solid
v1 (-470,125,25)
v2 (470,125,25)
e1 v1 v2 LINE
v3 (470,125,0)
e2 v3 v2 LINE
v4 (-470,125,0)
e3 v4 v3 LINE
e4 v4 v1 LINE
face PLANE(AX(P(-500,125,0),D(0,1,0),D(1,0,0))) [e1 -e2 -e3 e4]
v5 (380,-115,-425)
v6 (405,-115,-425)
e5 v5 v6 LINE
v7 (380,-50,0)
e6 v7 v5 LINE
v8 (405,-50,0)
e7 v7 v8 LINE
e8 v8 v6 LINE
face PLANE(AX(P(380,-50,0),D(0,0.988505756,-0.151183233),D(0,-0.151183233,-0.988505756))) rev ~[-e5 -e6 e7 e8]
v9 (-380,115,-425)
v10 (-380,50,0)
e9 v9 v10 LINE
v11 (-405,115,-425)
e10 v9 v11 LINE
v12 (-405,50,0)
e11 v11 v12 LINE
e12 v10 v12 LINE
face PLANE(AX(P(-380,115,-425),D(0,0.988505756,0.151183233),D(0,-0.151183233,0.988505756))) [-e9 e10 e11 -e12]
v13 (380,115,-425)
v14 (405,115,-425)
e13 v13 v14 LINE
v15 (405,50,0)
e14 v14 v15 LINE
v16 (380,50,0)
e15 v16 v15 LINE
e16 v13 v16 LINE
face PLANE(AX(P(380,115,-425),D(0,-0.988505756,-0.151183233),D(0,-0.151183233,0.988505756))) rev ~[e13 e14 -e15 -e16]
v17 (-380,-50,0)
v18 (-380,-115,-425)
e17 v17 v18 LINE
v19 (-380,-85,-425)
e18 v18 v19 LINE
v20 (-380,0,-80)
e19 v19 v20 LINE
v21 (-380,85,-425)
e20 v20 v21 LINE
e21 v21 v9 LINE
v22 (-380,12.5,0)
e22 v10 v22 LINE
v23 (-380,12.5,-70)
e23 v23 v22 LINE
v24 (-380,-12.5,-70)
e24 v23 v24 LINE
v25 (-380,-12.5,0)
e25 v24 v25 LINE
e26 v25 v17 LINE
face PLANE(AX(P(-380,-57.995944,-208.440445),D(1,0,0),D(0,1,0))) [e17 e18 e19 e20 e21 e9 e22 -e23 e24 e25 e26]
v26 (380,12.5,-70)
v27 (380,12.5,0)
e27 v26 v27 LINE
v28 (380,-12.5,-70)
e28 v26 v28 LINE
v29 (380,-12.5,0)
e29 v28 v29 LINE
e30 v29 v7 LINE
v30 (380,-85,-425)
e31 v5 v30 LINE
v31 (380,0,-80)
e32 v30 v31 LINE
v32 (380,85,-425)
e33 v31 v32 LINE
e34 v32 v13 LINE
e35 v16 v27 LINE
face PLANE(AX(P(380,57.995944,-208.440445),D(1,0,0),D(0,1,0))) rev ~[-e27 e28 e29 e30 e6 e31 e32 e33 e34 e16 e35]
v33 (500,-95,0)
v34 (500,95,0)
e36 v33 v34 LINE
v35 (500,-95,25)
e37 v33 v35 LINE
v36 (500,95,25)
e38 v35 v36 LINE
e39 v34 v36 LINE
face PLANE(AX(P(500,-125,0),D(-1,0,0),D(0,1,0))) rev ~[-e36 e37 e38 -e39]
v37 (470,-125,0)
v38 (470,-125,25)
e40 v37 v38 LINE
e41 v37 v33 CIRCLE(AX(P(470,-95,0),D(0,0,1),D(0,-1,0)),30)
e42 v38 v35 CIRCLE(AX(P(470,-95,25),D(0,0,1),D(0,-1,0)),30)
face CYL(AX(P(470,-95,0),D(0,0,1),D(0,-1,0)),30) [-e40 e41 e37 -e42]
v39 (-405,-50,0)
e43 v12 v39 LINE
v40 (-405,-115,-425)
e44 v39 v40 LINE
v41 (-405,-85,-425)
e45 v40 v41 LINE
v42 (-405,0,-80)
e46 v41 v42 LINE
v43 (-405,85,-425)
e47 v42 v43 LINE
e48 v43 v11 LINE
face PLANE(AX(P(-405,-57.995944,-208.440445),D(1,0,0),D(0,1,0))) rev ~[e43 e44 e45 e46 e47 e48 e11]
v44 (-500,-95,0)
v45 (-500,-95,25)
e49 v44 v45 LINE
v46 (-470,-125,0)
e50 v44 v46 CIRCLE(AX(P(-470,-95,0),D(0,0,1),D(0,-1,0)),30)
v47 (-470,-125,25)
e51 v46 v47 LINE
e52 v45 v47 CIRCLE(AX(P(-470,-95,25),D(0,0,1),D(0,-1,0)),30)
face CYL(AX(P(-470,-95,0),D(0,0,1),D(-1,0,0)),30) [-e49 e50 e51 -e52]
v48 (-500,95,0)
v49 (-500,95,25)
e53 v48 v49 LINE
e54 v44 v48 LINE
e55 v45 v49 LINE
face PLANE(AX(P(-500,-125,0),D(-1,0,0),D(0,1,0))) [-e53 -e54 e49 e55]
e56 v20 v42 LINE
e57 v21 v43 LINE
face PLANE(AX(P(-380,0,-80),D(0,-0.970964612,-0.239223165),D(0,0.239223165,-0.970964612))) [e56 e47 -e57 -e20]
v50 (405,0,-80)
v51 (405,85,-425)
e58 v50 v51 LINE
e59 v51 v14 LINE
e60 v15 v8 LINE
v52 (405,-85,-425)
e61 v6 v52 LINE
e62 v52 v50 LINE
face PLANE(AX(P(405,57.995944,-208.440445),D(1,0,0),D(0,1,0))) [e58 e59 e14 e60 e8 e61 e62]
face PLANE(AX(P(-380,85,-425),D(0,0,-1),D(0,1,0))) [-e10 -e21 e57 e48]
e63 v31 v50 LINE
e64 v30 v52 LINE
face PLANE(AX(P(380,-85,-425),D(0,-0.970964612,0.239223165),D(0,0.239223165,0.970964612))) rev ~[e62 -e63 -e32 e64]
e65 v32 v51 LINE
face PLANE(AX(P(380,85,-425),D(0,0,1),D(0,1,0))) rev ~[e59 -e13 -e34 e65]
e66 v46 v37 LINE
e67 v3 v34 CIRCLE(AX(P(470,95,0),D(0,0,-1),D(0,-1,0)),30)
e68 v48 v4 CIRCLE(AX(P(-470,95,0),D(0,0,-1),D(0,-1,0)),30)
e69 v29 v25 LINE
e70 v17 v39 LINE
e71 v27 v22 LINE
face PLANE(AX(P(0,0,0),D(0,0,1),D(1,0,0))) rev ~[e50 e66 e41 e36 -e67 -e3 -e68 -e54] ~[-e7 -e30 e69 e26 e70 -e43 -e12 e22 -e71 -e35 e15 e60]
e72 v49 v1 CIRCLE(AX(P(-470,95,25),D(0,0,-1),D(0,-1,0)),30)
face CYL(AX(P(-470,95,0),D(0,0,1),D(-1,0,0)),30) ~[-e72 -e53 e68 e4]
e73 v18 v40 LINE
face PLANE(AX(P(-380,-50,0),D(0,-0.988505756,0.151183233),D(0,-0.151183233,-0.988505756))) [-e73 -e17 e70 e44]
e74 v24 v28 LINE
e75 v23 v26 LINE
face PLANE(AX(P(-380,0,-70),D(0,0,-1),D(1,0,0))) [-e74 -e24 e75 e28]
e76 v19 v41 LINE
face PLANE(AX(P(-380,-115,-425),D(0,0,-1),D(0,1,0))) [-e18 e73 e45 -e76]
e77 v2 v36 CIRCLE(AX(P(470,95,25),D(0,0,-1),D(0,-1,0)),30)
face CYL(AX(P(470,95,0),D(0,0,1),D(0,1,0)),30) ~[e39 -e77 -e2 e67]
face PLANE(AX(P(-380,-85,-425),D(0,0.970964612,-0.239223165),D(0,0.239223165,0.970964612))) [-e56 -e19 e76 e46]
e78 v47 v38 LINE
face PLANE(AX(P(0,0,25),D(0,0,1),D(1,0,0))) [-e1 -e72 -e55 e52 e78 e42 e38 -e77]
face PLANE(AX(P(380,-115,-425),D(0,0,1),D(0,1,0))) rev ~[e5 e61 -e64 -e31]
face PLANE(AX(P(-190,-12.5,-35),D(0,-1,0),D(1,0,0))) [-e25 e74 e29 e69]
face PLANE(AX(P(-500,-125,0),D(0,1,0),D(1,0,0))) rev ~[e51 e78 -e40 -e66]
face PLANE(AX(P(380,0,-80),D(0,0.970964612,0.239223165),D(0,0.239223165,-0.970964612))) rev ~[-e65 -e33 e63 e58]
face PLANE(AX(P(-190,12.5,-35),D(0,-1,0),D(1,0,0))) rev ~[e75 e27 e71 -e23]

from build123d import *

# Parameters (mm, degrees)
F0_W     = 1000
F0_H     = 250
F1_DEPTH = 25
F2_W     = 380
F2_H     = 70
F3_DEPTH = 12.5
F5_START = 380
F5_DEPTH = 25
F6_START = -380
F6_DEPTH = 25
F7_R     = 30


with BuildPart() as f1:
    # F0 (on Top) → F1 (new body)
    with BuildSketch(Plane.XY):
        Rectangle(F0_W, F0_H)
    extrude(amount=F1_DEPTH)

    # F2 (on Front) → F3 (join, symmetric)
    with BuildSketch(Plane.XZ):
        with Locations((-190, -35)):
            Rectangle(F2_W, F2_H)
        with Locations((190, -35)):
            Rectangle(F2_W, F2_H)
    extrude(amount=F3_DEPTH, both=True)

    # F4 (on Right) → F5 (join)
    with BuildSketch(Plane.YZ.offset(F5_START)):
        Polygon((50, 0), (0, 0), (0, -80), (85, -425), (115, -425), align=None)
        Polygon((0, -80), (0, 0), (-50, 0), (-115, -425), (-85, -425), align=None)
    extrude(amount=F5_DEPTH)

    # F4 (on Right) → F6 (join)
    with BuildSketch(Plane.YZ.offset(F6_START)):
        Polygon((0, -80), (0, 0), (-50, 0), (-115, -425), (-85, -425), align=None)
        Polygon((50, 0), (0, 0), (0, -80), (85, -425), (115, -425), align=None)
    extrude(amount=-F6_DEPTH)

    # F7
    f7_edges = [f1.edges().sort_by_distance(p)[0] for p in [
        (500, 125, 12.5),
        (500, -125, 12.5),
        (-500, 125, 12.5),
        (-500, -125, 12.5),
    ]]
    fillet(f7_edges, radius=F7_R)


solid = f1.part
